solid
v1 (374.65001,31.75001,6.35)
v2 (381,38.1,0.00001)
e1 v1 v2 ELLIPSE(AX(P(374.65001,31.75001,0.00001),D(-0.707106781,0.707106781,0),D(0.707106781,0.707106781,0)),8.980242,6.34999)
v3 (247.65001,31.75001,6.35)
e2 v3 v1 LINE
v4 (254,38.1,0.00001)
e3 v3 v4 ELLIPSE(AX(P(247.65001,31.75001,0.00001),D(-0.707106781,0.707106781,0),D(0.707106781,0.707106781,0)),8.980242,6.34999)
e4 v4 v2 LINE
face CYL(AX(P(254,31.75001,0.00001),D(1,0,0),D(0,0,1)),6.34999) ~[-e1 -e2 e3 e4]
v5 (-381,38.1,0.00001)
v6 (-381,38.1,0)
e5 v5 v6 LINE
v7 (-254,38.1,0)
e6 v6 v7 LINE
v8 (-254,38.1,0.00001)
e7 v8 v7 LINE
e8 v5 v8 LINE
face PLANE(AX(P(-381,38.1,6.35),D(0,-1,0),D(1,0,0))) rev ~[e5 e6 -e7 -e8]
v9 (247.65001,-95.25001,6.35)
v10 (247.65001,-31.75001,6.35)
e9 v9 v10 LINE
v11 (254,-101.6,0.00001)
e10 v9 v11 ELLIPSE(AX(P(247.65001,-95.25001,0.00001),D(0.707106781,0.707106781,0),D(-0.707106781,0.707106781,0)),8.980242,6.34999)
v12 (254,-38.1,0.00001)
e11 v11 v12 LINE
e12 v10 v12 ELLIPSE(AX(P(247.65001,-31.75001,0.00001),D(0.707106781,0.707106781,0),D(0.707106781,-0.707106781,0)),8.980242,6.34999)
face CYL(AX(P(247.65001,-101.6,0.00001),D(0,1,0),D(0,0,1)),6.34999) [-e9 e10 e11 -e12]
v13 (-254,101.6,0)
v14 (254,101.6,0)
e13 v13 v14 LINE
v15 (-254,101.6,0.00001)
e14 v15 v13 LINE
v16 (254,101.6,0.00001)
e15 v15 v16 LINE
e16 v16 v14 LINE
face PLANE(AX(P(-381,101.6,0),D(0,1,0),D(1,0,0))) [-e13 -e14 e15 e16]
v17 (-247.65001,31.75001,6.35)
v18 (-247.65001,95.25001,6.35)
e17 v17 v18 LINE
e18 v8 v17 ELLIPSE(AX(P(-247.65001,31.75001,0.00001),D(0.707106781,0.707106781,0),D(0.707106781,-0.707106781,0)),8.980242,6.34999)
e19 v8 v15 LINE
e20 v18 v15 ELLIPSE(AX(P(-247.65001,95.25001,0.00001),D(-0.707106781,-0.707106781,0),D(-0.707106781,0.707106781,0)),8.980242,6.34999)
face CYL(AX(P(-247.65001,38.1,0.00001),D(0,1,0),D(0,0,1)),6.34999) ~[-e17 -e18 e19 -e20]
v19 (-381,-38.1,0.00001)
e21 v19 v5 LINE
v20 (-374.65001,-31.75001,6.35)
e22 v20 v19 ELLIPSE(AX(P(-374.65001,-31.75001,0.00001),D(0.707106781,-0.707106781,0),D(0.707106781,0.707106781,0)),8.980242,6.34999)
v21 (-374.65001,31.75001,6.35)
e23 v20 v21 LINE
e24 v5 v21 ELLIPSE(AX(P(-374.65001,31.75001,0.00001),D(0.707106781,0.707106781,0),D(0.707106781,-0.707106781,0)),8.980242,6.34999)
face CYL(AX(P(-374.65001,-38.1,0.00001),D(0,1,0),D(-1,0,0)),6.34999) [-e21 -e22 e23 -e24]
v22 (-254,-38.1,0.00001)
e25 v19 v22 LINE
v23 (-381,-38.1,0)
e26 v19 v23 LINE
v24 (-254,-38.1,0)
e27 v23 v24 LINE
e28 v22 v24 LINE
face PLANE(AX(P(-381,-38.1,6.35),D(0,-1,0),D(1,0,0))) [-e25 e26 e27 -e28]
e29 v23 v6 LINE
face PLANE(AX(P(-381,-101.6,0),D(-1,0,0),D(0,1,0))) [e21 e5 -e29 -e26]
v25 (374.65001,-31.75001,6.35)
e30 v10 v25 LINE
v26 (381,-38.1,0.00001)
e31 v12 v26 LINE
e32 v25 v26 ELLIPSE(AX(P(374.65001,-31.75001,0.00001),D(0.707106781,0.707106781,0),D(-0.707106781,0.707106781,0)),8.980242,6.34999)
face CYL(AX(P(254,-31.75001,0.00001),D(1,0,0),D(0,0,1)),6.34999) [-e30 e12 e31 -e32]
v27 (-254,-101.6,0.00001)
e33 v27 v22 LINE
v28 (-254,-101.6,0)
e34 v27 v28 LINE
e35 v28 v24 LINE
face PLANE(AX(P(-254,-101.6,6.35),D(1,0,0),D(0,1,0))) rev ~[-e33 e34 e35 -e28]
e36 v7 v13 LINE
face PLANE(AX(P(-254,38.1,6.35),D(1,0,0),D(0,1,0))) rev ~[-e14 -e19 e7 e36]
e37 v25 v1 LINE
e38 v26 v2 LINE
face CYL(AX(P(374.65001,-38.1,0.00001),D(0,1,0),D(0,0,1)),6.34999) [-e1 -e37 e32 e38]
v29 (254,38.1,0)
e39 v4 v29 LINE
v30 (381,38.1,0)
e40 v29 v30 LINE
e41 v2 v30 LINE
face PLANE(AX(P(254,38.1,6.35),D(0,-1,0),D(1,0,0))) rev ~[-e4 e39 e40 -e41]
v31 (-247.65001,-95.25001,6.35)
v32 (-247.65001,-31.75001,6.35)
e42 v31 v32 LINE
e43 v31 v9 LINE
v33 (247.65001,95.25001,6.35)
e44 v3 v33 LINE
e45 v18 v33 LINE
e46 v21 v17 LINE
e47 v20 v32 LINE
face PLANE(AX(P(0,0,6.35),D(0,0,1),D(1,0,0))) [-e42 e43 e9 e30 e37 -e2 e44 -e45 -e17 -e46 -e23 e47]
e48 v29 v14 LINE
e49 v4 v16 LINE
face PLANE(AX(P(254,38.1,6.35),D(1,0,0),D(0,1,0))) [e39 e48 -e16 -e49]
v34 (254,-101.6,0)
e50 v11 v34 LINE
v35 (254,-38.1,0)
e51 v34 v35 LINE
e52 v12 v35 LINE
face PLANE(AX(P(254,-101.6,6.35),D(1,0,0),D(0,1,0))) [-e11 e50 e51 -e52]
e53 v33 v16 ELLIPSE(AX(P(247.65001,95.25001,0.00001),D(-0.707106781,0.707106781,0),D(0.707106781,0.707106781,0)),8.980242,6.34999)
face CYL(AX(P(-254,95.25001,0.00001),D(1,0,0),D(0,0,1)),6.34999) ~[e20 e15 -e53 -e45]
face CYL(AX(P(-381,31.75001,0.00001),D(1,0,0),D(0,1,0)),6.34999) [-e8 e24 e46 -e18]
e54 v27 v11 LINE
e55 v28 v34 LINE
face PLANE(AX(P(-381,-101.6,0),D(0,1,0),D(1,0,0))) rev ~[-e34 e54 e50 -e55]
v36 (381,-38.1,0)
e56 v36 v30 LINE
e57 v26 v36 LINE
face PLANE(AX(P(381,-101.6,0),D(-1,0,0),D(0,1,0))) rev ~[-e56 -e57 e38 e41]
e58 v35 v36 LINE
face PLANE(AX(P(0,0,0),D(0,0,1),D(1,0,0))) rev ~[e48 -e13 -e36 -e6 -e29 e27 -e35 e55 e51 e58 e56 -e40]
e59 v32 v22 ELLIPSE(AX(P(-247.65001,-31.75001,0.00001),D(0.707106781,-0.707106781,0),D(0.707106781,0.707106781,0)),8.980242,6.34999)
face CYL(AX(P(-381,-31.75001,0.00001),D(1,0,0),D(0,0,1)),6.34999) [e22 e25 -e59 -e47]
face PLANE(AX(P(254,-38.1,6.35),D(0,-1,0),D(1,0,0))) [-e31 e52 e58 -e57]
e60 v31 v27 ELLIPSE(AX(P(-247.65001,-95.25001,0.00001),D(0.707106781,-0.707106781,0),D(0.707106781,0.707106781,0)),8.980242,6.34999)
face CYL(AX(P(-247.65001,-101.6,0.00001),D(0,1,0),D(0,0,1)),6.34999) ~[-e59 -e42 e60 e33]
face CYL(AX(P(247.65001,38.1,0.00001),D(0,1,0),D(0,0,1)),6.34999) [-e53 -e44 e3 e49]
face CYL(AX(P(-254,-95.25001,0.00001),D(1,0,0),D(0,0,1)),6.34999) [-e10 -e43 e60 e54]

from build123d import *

# Parameters (mm, degrees)
F0_W     = 762
F0_H     = 203.2
F1_DEPTH = 6.35
F2_W     = 127
F2_H     = 63.5
F3_DEPTH = 25.4
F4_W     = 127
F4_H     = 63.5
F5_DEPTH = 25.4
F6_W     = 127
F6_H     = 63.5
F7_DEPTH = 25.4
F8_W     = 127
F8_H     = 63.5
F9_DEPTH = 25.4
F10_R    = 6.34999


# Not quite as in the source:
# - a fillet or chamfer is up to 0.001 mm smaller than in the source, because OpenCascade refuses the exact size


with BuildPart() as f1:
    # F0 (on Top) → F1 (new body)
    with BuildSketch(Plane.XY):
        Rectangle(F0_W, F0_H)
    extrude(amount=F1_DEPTH)

    # F2 (on face) → F3 (cut)
    with BuildSketch(Plane.XY.offset(6.35)):
        with Locations((317.5, 69.85)):
            Rectangle(F2_W, F2_H)
    extrude(amount=-F3_DEPTH, mode=Mode.SUBTRACT)

    # F4 (on face) → F5 (cut)
    with BuildSketch(Plane.XY.offset(6.35)):
        with Locations((317.5, -69.85)):
            Rectangle(F4_W, F4_H)
    extrude(amount=-F5_DEPTH, mode=Mode.SUBTRACT)

    # F6 (on face) → F7 (cut)
    with BuildSketch(Plane.XY.offset(6.35)):
        with Locations((-317.5, 69.85)):
            Rectangle(F6_W, F6_H)
    extrude(amount=-F7_DEPTH, mode=Mode.SUBTRACT)

    # F8 (on face) → F9 (cut)
    with BuildSketch(Plane.XY.offset(6.35)):
        with Locations((-317.5, -69.85)):
            Rectangle(F8_W, F8_H)
    extrude(amount=-F9_DEPTH, mode=Mode.SUBTRACT)

    # F10 (radius 6.35 in the source; OpenCascade refuses exactly that, so slightly less here)
    f10_edges = [f1.edges().sort_by_distance(p)[0] for p in [
        (-317.5, 38.1, 6.35),
        (-254, 69.85, 6.35),
        (0, 101.6, 6.35),
        (254, 69.85, 6.35),
        (317.5, 38.1, 6.35),
        (381, 0, 6.35),
        (317.5, -38.1, 6.35),
        (254, -69.85, 6.35),
        (0, -101.6, 6.35),
        (-254, -69.85, 6.35),
        (-317.5, -38.1, 6.35),
        (-381, 0, 6.35),
    ]]
    fillet(f10_edges, radius=F10_R)


solid = f1.part
